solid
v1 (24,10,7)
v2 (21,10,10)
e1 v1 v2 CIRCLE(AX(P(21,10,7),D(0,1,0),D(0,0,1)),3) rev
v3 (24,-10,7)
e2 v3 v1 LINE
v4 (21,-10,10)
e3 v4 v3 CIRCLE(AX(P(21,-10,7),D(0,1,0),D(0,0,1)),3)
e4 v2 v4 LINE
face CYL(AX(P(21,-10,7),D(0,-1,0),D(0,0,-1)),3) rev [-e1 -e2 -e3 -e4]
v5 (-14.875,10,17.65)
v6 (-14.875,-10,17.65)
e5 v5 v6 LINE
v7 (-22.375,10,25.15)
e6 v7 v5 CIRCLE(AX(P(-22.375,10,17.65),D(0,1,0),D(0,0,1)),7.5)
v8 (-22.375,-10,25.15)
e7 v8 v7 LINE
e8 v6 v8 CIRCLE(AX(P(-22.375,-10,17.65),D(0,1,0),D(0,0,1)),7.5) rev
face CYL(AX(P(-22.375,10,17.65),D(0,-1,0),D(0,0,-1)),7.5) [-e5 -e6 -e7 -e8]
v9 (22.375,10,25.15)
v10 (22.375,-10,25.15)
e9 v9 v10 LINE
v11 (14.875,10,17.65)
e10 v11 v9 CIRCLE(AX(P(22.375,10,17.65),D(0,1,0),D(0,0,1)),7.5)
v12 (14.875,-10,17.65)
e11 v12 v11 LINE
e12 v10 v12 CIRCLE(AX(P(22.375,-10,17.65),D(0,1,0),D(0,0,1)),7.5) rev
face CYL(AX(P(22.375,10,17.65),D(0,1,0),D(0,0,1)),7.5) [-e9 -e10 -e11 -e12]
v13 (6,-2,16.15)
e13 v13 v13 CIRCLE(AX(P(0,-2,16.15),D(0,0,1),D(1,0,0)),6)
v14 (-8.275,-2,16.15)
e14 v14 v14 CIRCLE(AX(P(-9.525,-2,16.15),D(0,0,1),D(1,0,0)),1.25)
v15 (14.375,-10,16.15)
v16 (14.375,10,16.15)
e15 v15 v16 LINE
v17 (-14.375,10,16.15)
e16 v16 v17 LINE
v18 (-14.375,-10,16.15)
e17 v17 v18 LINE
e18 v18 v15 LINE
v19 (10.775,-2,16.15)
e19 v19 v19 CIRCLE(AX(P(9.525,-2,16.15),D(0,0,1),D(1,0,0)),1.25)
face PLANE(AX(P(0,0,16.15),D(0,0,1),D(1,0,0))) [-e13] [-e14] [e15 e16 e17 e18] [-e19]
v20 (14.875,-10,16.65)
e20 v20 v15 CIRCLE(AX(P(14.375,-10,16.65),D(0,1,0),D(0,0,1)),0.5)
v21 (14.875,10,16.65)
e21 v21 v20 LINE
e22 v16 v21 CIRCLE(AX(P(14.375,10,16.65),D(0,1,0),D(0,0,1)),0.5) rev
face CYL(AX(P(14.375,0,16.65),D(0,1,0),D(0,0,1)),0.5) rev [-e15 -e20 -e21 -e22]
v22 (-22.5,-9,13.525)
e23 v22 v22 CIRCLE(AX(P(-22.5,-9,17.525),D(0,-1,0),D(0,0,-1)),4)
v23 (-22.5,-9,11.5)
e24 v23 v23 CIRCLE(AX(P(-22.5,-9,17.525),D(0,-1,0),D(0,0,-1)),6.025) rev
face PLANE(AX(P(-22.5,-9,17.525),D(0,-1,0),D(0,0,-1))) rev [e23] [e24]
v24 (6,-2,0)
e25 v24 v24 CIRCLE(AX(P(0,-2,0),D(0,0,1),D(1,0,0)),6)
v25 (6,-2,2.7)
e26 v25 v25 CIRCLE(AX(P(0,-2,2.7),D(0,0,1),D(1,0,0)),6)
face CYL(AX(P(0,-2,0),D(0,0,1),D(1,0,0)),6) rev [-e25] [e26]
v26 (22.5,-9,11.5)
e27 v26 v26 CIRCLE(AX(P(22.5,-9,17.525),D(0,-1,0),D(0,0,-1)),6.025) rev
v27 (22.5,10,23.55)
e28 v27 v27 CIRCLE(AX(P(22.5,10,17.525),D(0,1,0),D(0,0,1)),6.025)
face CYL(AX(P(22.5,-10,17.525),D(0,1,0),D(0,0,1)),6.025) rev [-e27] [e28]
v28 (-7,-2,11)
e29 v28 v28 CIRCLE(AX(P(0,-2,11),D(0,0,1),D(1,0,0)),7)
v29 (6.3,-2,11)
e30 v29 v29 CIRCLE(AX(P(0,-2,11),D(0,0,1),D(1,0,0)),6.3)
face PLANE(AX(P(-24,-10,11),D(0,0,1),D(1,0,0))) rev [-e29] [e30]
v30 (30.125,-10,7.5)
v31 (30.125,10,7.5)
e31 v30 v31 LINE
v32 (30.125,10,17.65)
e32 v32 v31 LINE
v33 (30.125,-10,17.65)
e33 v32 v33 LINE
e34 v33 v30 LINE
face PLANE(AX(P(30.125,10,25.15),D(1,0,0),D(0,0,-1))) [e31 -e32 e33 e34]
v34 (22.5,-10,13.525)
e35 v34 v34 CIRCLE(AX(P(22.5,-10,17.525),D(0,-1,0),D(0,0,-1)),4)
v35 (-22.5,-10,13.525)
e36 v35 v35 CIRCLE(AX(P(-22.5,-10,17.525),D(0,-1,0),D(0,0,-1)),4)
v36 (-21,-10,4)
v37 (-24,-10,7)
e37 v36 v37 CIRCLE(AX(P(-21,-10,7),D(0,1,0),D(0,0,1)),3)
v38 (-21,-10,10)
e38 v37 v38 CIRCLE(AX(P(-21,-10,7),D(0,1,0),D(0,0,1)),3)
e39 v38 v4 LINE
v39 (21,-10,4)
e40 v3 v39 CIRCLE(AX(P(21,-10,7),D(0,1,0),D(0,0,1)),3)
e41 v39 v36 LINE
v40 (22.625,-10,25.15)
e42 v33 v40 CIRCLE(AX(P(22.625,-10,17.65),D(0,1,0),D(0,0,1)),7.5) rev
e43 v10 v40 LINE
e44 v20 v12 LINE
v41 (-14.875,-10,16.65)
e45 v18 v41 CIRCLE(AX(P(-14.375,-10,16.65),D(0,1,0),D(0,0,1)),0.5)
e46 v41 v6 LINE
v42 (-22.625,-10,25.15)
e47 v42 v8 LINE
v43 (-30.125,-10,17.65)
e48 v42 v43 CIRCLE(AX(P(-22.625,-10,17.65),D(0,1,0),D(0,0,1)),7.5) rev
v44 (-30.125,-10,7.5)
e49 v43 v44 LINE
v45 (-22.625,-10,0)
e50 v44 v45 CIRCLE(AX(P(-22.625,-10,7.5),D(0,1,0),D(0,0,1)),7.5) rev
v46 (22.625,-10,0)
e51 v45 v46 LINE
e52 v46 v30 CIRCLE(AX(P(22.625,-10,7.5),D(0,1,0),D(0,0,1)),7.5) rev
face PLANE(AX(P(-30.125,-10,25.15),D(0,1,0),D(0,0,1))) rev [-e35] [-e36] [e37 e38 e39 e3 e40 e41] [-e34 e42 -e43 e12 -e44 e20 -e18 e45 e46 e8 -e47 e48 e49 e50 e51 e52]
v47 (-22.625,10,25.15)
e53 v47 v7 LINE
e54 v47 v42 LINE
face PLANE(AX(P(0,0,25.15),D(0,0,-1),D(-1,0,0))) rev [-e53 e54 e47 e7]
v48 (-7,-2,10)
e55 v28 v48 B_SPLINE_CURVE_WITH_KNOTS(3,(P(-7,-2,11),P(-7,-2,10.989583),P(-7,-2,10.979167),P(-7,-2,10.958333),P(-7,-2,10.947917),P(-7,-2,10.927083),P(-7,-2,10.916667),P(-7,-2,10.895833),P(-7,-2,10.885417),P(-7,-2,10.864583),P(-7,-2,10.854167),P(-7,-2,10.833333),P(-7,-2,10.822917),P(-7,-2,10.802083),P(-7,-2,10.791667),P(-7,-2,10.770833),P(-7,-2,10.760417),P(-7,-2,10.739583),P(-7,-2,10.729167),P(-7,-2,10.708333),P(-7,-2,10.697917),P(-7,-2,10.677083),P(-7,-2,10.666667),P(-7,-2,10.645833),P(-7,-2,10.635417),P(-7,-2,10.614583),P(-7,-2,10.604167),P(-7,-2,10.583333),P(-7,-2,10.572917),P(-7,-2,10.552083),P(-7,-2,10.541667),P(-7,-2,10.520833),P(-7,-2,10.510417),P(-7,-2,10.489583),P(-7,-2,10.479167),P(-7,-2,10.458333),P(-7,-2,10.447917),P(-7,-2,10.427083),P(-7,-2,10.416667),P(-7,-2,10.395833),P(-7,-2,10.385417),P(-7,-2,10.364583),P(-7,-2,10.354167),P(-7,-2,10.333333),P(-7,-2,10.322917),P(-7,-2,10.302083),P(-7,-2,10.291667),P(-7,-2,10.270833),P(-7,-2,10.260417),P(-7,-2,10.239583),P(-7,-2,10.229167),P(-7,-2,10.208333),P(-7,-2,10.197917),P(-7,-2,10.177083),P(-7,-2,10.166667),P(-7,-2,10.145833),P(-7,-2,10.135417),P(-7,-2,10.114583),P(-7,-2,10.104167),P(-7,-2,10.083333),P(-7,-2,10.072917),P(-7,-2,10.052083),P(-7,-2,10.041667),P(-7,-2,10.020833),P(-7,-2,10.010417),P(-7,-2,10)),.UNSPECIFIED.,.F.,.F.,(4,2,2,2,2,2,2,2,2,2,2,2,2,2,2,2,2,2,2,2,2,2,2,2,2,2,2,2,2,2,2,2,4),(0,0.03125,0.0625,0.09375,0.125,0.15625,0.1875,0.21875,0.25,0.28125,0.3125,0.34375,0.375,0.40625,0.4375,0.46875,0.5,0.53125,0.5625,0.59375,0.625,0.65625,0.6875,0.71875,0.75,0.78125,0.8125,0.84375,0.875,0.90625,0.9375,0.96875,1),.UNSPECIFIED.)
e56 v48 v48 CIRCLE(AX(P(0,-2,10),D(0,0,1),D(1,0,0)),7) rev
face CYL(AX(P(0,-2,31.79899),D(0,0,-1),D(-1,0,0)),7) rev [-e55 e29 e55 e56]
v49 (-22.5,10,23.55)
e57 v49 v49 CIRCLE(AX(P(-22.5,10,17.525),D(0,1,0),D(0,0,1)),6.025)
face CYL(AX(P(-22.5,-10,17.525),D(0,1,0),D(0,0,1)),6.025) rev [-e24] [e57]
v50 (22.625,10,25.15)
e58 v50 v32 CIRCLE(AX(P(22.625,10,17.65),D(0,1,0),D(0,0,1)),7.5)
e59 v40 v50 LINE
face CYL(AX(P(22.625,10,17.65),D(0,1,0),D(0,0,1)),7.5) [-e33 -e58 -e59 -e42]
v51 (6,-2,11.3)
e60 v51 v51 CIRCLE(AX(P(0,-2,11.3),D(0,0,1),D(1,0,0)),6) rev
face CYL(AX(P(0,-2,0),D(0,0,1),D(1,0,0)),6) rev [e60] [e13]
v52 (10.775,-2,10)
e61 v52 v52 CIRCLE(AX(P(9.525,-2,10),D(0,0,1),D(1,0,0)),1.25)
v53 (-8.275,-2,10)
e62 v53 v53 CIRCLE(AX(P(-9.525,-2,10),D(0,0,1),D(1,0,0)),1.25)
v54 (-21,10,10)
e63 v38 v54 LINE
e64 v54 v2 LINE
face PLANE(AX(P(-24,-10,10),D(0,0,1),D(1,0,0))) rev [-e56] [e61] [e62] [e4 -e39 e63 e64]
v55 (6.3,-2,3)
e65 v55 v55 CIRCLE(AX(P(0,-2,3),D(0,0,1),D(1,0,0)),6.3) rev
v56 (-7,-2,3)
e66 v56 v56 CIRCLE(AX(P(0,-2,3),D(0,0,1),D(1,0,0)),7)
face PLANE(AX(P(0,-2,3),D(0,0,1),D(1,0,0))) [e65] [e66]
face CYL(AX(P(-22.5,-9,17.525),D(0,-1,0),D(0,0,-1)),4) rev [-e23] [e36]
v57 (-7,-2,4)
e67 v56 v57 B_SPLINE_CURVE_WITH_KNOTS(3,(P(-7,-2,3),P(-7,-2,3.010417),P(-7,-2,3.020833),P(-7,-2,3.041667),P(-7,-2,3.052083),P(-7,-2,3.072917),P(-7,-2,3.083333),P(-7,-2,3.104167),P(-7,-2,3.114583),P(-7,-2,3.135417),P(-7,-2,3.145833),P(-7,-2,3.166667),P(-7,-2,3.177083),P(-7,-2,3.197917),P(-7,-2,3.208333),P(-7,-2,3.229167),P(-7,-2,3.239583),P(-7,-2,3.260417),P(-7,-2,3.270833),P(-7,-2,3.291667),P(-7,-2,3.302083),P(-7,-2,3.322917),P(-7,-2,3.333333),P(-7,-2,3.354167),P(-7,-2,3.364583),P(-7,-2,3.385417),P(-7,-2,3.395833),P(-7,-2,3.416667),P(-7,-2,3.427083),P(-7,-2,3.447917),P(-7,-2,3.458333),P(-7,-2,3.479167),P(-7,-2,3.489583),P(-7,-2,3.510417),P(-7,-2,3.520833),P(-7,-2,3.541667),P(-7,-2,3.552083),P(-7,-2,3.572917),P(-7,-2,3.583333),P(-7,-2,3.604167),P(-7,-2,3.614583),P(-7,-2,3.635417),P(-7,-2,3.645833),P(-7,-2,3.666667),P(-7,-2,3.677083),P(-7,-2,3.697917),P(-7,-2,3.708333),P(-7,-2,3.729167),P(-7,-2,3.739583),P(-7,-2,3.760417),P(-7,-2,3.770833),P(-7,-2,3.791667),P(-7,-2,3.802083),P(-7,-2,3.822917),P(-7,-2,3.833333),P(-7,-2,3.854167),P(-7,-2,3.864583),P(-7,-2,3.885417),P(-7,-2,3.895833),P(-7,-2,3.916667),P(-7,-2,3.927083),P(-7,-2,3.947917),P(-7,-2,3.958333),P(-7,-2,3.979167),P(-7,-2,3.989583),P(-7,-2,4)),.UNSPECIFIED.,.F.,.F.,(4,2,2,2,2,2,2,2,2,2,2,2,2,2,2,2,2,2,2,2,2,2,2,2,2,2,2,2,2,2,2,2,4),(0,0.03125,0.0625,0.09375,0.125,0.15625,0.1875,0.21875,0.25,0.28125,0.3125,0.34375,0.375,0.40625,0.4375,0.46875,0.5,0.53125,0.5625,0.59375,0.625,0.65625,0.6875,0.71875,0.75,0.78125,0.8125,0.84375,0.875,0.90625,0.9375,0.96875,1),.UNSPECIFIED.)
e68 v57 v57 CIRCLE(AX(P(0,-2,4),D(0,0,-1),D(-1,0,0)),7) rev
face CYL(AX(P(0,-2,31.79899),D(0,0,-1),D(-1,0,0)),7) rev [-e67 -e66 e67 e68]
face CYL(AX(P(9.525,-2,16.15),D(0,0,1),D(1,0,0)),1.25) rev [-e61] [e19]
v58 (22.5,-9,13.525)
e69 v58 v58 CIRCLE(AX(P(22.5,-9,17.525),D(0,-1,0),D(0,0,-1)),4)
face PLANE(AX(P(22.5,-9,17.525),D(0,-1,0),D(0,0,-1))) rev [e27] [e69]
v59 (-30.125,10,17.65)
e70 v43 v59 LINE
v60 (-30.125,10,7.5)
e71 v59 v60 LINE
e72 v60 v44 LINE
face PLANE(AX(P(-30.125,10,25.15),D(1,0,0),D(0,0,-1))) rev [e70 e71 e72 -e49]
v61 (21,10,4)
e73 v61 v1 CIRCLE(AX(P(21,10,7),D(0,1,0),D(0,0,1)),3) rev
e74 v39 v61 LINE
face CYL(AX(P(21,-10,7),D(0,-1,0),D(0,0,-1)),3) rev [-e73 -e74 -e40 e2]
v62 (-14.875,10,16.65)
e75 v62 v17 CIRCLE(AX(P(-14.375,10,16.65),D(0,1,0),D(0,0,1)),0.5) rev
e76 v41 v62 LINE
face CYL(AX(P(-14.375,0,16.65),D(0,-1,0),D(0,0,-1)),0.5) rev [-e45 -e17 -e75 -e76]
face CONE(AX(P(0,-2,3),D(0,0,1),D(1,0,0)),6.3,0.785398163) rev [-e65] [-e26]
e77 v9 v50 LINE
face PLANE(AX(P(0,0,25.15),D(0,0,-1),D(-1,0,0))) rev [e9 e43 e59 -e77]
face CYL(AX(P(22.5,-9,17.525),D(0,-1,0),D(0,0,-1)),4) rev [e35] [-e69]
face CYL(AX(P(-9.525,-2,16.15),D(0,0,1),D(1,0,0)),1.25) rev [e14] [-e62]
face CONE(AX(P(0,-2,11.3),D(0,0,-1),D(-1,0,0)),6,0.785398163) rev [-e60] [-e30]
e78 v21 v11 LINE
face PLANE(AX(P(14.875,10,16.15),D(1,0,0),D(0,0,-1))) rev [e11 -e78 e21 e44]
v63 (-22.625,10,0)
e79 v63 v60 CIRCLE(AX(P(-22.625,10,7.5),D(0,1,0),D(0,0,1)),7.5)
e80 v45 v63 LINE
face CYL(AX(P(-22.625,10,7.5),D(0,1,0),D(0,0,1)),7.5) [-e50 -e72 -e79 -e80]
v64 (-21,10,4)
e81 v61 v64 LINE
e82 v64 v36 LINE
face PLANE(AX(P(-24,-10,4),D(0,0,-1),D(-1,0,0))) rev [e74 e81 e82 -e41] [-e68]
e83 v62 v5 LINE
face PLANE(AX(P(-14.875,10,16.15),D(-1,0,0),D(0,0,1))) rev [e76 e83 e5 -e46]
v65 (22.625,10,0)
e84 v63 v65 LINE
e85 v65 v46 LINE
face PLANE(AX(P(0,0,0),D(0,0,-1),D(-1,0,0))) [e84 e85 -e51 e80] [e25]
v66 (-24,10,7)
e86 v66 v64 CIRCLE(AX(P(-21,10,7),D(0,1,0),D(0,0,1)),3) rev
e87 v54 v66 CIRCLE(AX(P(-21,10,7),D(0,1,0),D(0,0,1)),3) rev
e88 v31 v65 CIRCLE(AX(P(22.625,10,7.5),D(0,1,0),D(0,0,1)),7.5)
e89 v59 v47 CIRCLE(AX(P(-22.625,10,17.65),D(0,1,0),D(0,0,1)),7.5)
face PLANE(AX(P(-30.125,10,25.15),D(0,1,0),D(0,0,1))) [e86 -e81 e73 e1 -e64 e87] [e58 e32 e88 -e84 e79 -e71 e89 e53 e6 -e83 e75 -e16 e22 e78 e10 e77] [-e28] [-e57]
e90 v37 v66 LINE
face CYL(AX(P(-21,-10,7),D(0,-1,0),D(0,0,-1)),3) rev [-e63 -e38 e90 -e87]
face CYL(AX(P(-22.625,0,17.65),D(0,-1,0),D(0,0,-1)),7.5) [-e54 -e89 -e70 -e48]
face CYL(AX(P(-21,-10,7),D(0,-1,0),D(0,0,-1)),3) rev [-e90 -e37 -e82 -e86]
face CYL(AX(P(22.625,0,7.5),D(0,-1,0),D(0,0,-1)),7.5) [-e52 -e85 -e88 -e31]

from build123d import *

# Parameters (mm, degrees)
ESQUISSE2_W                         = 60.25
ESQUISSE2_H                         = 20
BOSS_EXTRU_2_DEPTH                  = 25.15
ESQUISSE3_W                         = 29.75
ESQUISSE3_H                         = 20
ENL_V_MAT_EXTRU_1_DEPTH             = 9
ESQUISSE4_W                         = 48
ESQUISSE4_H                         = 6
ENL_V_MAT_EXTRU_2_DEPTH             = 45.045863881
ESQUISSE5_R                         = 6
ENL_V_MAT_EXTRU_3_DEPTH             = 36.613735061
ENL_V_START                         = -1
ESQUISSE6_R                         = 7
ENL_V_MAT_EXTRU_4_DEPTH             = 8
ESQUISSE7_R                         = 6.025
ENL_V_MAT_EXTRU_5_DEPTH             = 45.045863881
CONG_1_R                            = 7.5
CONG_2_R                            = 0.5
DIAM_TRE_DU_PER_AGE_2_5_2_5_1_D     = 2.5
DIAM_TRE_DU_PER_AGE_2_5_2_5_1_DEPTH = 6.15
CONG_4_R                            = 3
BOSS_EXTRU_3_START                  = -1
ESQUISSE11_R                        = 6.025
ESQUISSE11_R_2                      = 4
BOSS_EXTRU_3_DEPTH                  = 1
CHANFREIN2_SIZE                     = 0.3


with BuildPart() as part:
    # Esquisse2 → Boss.-Extru.2 (new body)
    with BuildSketch(Plane.XY):
        Rectangle(ESQUISSE2_W, ESQUISSE2_H)
    extrude(amount=BOSS_EXTRU_2_DEPTH)

    # Esquisse3 → Enlèv. mat.-Extru.1 (cut)
    with BuildSketch(Plane.XY.offset(25.15)):
        Rectangle(ESQUISSE3_W, ESQUISSE3_H)
    extrude(amount=-ENL_V_MAT_EXTRU_1_DEPTH, mode=Mode.SUBTRACT)

    # Esquisse4 → Enlèv. mat.-Extru.2 (cut, through all)
    with BuildSketch(Plane(origin=(0, 10, 0), x_dir=(1, 0, 0), z_dir=(0, 1, 0))):
        with Locations((0, -7)):
            Rectangle(ESQUISSE4_W, ESQUISSE4_H)
    extrude(amount=-ENL_V_MAT_EXTRU_2_DEPTH, mode=Mode.SUBTRACT)

    # Esquisse5 → Enlèv. mat.-Extru.3 (cut, through all)
    with BuildSketch(Plane.XY.offset(16.15)):
        with Locations((0, -2)):
            Circle(ESQUISSE5_R)
    extrude(amount=-ENL_V_MAT_EXTRU_3_DEPTH, mode=Mode.SUBTRACT)

    # Esquisse6 → Enlèv. mat.-Extru.4 (cut)
    with BuildSketch(Plane.XY.offset(4).offset(ENL_V_START)):
        with Locations(Location((0, -2, 0), (0, 0, 180))):
            Circle(ESQUISSE6_R)
    extrude(amount=ENL_V_MAT_EXTRU_4_DEPTH, mode=Mode.SUBTRACT)

    # Esquisse7 → Enlèv. mat.-Extru.5 (cut, through all)
    with BuildSketch(Plane(origin=(0, 10, 0), x_dir=(1, 0, 0), z_dir=(0, 1, 0))):
        with Locations(Location((-22.5, -17.525, 0), (0, 0, 270))):
            Circle(ESQUISSE7_R)
        with Locations(Location((22.5, -17.525, 0), (0, 0, 270))):
            Circle(ESQUISSE7_R)
    extrude(amount=-ENL_V_MAT_EXTRU_5_DEPTH, mode=Mode.SUBTRACT)

    # Congé1
    cong_1_edges = [part.edges().sort_by_distance(p)[0] for p in [
        (-30.125, 0, 25.15),
        (14.875, 0, 25.15),
        (-14.875, 0, 25.15),
        (-30.125, 0, 0),
        (30.125, 0, 0),
        (30.125, 0, 25.15),
    ]]
    fillet(cong_1_edges, radius=CONG_1_R)

    # Congé2
    cong_2_edges = [part.edges().sort_by_distance(p)[0] for p in [
        (14.875, 0, 16.15),
        (-14.875, 0, 16.15),
    ]]
    fillet(cong_2_edges, radius=CONG_2_R)

    # Diamètre du perçage Ø2.5 (2.5)1
    with Locations(Plane.XY.offset(16.15)):
        with Locations((-9.525, -2), (9.525, -2)):
            Hole(DIAM_TRE_DU_PER_AGE_2_5_2_5_1_D / 2, depth=DIAM_TRE_DU_PER_AGE_2_5_2_5_1_DEPTH)

    # Congé4
    cong_4_edges = [part.edges().sort_by_distance(p)[0] for p in [
        (-24, 0, 10),
        (-24, 0, 4),
        (24, 0, 4),
        (24, 0, 10),
    ]]
    fillet(cong_4_edges, radius=CONG_4_R - 0.0001)  # a hair under: the kernel refuses the full size

    # Esquisse11 → Boss.-Extru.3 (add)
    # profile 1 of 2: a face of its own
    with BuildSketch(Plane.XZ.offset(10).offset(BOSS_EXTRU_3_START)):
        with Locations(Location((22.5, 17.525, 0), (0, 0, 90))):
            Circle(ESQUISSE11_R)
        with Locations(Location((22.5, 17.525, 0), (0, 0, 270))):
            Circle(ESQUISSE11_R_2, mode=Mode.SUBTRACT)
    # profile 2 of 2: a face of its own
    with BuildSketch(Plane.XZ.offset(10).offset(BOSS_EXTRU_3_START)):
        with Locations(Location((-22.5, 17.525, 0), (0, 0, 90))):
            Circle(ESQUISSE11_R)
        with Locations(Location((-22.5, 17.525, 0), (0, 0, 270))):
            Circle(ESQUISSE11_R_2, mode=Mode.SUBTRACT)
    extrude(amount=BOSS_EXTRU_3_DEPTH)

    # Chanfrein2
    chanfrein2_edges = [part.edges().sort_by_distance(p)[0] for p in [
        (-6, -2, 11),
        (-6, -2, 3),
    ]]
    chamfer(chanfrein2_edges, length=CHANFREIN2_SIZE)


solid = part.part
